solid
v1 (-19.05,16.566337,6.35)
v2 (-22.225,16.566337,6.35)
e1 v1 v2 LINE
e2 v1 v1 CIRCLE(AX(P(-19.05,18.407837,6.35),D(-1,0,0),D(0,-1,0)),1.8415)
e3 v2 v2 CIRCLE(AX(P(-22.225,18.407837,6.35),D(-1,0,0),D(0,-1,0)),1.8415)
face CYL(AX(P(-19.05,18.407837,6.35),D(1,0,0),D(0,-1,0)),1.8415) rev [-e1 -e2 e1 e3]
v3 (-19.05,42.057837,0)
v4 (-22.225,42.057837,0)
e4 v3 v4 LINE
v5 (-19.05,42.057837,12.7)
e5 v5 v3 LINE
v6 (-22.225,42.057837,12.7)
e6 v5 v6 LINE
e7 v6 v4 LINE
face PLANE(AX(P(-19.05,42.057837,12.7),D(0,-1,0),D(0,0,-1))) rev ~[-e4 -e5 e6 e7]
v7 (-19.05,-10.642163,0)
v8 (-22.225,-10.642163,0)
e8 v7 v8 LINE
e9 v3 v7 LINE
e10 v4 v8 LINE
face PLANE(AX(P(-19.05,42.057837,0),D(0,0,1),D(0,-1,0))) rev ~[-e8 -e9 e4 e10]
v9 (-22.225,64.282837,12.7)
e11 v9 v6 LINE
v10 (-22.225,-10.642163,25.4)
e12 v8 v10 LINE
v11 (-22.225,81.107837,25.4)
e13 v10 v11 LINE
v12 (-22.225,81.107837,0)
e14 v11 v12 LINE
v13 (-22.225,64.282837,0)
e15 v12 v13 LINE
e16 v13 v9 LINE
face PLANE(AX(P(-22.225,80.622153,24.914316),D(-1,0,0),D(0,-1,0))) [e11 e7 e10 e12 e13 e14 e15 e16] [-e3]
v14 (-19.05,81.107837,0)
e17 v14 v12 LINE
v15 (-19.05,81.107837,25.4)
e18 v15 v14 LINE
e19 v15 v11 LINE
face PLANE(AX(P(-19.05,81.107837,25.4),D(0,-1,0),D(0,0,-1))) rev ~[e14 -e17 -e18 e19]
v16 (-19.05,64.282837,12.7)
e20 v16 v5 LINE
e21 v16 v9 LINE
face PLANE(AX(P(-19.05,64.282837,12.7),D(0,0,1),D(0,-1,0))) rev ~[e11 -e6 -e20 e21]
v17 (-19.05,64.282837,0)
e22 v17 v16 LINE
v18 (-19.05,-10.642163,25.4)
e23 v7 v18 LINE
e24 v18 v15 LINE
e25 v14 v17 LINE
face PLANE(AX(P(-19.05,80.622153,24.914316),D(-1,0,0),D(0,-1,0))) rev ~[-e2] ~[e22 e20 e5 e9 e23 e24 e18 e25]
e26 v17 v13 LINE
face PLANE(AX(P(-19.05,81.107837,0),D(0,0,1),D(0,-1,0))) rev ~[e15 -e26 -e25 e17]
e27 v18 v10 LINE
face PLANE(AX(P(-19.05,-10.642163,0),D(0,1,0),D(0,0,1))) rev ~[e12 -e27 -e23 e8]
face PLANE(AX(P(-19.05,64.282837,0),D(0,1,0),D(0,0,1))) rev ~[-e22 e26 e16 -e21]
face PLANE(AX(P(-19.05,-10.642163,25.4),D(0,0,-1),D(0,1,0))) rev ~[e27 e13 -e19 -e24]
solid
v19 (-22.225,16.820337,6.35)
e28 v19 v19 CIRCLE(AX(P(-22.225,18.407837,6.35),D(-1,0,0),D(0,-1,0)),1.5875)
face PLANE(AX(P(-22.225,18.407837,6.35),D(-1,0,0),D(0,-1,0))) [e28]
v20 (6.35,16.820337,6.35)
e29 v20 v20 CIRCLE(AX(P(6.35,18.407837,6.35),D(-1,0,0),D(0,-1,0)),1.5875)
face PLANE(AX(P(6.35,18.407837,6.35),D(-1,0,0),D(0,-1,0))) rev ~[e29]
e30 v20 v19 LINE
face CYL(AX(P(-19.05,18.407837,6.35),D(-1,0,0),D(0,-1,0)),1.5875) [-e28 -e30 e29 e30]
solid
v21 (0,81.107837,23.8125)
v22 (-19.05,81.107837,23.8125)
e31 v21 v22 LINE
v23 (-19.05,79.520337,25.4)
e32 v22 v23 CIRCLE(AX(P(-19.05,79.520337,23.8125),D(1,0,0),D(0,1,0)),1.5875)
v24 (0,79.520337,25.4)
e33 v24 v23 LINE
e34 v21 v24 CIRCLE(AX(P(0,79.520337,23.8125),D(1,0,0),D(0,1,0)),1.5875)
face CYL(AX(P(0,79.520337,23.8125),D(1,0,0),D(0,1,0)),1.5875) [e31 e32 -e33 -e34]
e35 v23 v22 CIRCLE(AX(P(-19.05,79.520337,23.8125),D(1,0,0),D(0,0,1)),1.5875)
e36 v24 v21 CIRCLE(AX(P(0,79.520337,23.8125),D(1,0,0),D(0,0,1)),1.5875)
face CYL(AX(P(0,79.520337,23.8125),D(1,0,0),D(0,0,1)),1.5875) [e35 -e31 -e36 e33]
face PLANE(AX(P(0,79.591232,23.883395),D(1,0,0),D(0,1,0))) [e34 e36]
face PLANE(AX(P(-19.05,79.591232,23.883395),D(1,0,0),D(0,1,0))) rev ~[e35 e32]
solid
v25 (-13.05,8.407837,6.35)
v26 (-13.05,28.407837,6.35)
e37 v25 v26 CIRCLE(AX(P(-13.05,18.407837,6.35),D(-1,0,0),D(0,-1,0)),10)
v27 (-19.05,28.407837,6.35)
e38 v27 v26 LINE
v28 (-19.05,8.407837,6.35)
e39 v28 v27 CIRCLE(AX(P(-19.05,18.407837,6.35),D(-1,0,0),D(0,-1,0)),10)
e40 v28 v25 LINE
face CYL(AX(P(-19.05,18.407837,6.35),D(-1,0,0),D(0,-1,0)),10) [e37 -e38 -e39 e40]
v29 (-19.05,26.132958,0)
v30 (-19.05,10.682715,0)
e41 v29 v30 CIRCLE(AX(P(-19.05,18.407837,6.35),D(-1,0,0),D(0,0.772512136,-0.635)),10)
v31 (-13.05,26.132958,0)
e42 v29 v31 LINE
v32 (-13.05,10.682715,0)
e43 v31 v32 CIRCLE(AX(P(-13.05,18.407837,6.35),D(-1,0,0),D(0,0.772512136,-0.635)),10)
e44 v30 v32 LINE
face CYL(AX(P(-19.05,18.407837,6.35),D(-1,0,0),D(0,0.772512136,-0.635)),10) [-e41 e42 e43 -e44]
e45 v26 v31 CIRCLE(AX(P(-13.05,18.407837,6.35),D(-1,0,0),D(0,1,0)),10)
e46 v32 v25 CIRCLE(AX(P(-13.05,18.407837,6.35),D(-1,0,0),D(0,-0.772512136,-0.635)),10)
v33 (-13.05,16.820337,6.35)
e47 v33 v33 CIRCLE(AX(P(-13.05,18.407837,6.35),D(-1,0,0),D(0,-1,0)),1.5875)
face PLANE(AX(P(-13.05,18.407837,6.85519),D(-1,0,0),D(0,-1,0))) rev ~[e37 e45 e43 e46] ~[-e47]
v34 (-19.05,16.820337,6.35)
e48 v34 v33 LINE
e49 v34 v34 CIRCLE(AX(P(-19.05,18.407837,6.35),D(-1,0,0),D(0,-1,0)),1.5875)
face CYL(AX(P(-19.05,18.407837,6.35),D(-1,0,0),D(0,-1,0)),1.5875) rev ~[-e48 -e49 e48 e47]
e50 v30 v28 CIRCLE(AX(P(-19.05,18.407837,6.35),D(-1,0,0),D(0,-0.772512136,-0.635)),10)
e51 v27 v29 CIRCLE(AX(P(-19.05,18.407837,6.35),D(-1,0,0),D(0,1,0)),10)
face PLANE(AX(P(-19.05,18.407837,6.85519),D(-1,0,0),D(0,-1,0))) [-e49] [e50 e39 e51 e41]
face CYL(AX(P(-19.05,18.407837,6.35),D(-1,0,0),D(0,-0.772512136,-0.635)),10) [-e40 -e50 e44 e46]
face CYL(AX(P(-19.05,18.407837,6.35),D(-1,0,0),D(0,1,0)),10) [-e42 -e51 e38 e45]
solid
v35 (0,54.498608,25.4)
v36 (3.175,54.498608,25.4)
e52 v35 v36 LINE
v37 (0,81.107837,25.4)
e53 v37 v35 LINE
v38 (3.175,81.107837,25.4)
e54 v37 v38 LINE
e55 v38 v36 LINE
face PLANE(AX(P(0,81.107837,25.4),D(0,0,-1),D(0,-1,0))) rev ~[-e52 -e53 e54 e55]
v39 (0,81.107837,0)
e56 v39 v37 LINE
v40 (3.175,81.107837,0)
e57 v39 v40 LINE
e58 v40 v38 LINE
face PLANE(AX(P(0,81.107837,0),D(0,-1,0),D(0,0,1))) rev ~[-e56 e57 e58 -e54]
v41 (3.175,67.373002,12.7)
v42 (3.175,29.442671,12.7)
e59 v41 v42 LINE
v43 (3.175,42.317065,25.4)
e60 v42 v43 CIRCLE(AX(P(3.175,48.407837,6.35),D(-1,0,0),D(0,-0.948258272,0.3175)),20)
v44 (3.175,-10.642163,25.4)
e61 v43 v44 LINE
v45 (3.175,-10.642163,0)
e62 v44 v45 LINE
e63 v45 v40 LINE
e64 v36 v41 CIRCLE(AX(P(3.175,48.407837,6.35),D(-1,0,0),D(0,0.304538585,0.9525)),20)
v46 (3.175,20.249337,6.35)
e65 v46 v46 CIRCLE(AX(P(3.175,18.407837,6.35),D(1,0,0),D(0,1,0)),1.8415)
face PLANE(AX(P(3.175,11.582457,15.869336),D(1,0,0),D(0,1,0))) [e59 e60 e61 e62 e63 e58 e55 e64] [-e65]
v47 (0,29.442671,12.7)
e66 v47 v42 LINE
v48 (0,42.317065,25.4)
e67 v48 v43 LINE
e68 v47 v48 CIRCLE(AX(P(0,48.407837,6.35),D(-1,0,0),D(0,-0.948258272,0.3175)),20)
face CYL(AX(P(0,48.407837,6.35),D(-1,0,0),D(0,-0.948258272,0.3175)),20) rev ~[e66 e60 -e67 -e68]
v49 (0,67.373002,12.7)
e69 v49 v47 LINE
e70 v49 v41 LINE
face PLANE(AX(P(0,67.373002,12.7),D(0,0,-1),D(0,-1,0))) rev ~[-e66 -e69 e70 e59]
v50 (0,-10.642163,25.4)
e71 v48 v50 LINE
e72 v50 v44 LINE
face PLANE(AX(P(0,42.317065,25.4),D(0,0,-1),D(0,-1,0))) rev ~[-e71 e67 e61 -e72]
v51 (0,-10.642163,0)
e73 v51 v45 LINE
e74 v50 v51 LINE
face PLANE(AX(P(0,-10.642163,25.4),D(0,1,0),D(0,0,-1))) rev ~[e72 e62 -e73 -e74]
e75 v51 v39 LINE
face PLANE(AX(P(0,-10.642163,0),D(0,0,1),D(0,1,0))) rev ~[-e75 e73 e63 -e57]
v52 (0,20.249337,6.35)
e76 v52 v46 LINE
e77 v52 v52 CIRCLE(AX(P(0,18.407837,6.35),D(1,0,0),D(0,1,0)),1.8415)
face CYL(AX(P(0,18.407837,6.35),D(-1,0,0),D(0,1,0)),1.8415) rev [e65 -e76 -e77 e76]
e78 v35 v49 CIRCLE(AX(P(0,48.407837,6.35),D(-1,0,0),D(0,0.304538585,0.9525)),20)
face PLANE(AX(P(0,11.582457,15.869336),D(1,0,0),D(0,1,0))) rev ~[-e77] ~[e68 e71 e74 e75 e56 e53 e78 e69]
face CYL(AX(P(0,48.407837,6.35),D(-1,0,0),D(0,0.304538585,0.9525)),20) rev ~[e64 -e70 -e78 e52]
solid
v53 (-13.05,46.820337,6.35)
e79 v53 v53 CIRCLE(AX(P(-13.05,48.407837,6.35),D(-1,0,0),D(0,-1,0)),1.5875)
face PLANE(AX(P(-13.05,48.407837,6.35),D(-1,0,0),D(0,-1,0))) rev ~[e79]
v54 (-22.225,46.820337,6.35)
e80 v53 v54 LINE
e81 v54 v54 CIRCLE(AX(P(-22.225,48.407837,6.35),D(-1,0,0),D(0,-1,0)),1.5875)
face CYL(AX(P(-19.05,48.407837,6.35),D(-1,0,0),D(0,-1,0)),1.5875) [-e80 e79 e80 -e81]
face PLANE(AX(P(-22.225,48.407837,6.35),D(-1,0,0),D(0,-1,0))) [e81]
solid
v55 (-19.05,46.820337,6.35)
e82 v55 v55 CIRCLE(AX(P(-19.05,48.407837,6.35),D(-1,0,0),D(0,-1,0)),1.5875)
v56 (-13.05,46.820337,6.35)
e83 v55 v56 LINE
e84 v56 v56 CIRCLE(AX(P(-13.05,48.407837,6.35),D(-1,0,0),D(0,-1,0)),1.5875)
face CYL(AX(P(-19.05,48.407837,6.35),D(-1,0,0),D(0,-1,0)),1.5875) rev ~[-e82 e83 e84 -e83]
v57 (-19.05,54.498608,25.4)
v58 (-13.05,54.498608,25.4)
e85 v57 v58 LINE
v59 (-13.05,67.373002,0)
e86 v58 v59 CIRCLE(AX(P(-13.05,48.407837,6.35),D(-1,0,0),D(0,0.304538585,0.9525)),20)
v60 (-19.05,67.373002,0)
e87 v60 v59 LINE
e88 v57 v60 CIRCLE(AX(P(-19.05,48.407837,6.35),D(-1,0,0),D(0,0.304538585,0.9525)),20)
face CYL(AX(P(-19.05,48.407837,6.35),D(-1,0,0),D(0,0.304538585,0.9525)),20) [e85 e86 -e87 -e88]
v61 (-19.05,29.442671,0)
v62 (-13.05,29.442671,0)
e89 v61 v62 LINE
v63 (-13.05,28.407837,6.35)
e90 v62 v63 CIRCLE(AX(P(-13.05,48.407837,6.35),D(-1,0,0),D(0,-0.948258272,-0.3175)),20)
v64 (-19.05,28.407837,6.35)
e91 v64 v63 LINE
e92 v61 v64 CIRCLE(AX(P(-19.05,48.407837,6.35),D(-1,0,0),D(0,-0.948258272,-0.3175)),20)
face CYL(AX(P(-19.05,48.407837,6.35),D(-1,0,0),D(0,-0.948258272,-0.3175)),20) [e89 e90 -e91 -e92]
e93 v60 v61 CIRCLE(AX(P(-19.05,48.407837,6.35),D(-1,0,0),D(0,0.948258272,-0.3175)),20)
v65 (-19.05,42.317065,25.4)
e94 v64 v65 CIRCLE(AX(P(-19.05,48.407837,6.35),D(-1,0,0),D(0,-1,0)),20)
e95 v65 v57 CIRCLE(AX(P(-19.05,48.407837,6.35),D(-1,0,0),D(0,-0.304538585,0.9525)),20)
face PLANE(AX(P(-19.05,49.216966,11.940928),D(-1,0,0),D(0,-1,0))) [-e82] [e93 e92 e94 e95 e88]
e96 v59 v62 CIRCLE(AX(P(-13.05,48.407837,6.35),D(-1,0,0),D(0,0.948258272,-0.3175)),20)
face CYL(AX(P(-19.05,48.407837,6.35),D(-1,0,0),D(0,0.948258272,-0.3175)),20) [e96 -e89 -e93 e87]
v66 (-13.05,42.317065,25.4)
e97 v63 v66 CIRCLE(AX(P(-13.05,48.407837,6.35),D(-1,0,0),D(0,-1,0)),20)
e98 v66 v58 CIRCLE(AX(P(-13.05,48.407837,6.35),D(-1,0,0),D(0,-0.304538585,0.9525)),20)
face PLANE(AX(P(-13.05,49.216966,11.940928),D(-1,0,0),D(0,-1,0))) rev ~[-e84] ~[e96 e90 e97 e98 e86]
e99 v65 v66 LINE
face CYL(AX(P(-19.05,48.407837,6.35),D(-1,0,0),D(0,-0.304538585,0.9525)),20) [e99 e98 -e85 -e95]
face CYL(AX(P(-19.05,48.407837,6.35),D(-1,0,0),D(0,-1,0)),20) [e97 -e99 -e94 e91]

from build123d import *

# Parameters (mm, degrees)
F0_R      = 1.8415
F0_R_2    = 1.5875
F1_DEPTH  = 3.175
F2_DEPTH  = 19.05
F3_R      = 1.8415
F4_DEPTH  = 3.175
F3_R_2    = 1.5875
F5_DEPTH  = 3.175
F6_DEPTH  = 6
F7_DEPTH  = 6
F8_DEPTH  = 3.175
F9_DEPTH  = 25.4
F10_DEPTH = 6


# Not quite as in the source:
# - a feature names something its author has since deleted; it is built from what else it names


with BuildPart() as f1:
    # F0 (on Right) → F1 (new body)
    with BuildSketch(Plane.YZ):
        with BuildLine():
            Line((26.1329581332, 12.7), (29.4426713393, 12.7))
            ThreePointArc((29.4426713393, 12.7), (34.3624639947, 20.5882408837), (42.3170650669, 25.4))
            Line((42.3170650669, 25.4), (41.8216693056, 25.4))
            Line((41.8216693056, 25.4), (35.8211970083, 25.4))
            Line((35.8211970083, 25.4), (-10.6421632251, 25.4))
            Line((-10.6421632251, 25.4), (-10.6421632251, 0))
            Line((-10.6421632251, 0), (10.6827154167, 0))
            ThreePointArc((10.6827154167, 0), (12.0578367749, 14.0751213583), (26.1329581332, 12.7))
        make_face()
        with BuildLine():
            ThreePointArc((67.3730022106, 0), (68.1474328791, 3.1331155377), (68.4078367749, 6.35))
            ThreePointArc((68.4078367749, 6.35), (68.1474328791, 9.5668844623), (67.3730022106, 12.7))
            Line((67.3730022106, 12.7), (29.4426713393, 12.7))
            ThreePointArc((29.4426713393, 12.7), (28.6682406708, 9.5668844623), (28.4078367749, 6.35))
            ThreePointArc((28.4078367749, 6.35), (28.6682406708, 3.1331155377), (29.4426713393, 0))
            Line((29.4426713393, 0), (67.3730022106, 0))
        make_face()
        with Locations((48.4078367749, 6.35)):
            Circle(F0_R, mode=Mode.SUBTRACT)
        with BuildLine():
            ThreePointArc((54.498608483, 25.4), (62.4532095552, 20.5882408837), (67.3730022106, 12.7))
            Line((67.3730022106, 12.7), (74.2828367749, 12.7))
            Line((74.2828367749, 12.7), (74.2828367749, 0))
            Line((74.2828367749, 0), (80.2833090723, 0))
            Line((80.2833090723, 0), (81.1078367749, 0))
            Line((81.1078367749, 0), (81.1078367749, 23.8125))
            ThreePointArc((81.1078367749, 23.8125), (78.3978047598, 22.6899679849), (79.5203367749, 25.4))
            Line((79.5203367749, 25.4), (54.498608483, 25.4))
        make_face()
        with BuildLine():
            Line((22.0578367749, 12.7), (26.1329581332, 12.7))
            ThreePointArc((26.1329581332, 12.7), (12.0578367749, 14.0751213583), (10.6827154167, 0))
            Line((10.6827154167, 0), (22.0578367749, 0))
            Line((22.0578367749, 0), (22.0578367749, 12.7))
        make_face()
        with Locations((18.4078367749, 6.35)):
            Circle(F0_R, mode=Mode.SUBTRACT)
        with BuildLine():
            ThreePointArc((67.3730022106, 12.7), (68.1474328791, 9.5668844623), (68.4078367749, 6.35))
            ThreePointArc((68.4078367749, 6.35), (68.1474328791, 3.1331155377), (67.3730022106, 0))
            Line((67.3730022106, 0), (73.4878367749, 0))
            Line((73.4878367749, 0), (74.2828367749, 0))
            Line((74.2828367749, 0), (74.2828367749, 12.7))
            Line((74.2828367749, 12.7), (67.3730022106, 12.7))
        make_face()
        with BuildLine():
            ThreePointArc((26.1329581332, 0), (27.8219541946, 2.9774055671), (28.4078367749, 6.35))
            ThreePointArc((28.4078367749, 6.35), (27.8219541946, 9.7225944329), (26.1329581332, 12.7))
            Line((26.1329581332, 12.7), (22.0578367749, 12.7))
            Line((22.0578367749, 12.7), (22.0578367749, 0))
            Line((22.0578367749, 0), (26.1329581332, 0))
        make_face()
        with Locations((48.4078367749, 6.35)):
            Circle(F0_R)
        with Locations((48.4078367749, 6.35)):
            Circle(F0_R_2, mode=Mode.SUBTRACT)
        with Locations((48.4078367749, 6.35)):
            Circle(F0_R_2)
        with BuildLine():
            ThreePointArc((81.1078367749, 23.8125), (80.6428687901, 24.9350320151), (79.5203367749, 25.4))
            ThreePointArc((79.5203367749, 25.4), (78.3978047598, 22.6899679849), (81.1078367749, 23.8125))
        make_face()
        with BuildLine():
            ThreePointArc((28.4078367749, 6.35), (28.6682406708, 9.5668844623), (29.4426713393, 12.7))
            Line((29.4426713393, 12.7), (26.1329581332, 12.7))
            ThreePointArc((26.1329581332, 12.7), (27.8219541946, 9.7225944329), (28.4078367749, 6.35))
        make_face()
        with BuildLine():
            Line((26.1329581332, 0), (29.4426713393, 0))
            ThreePointArc((29.4426713393, 0), (28.6682406708, 3.1331155377), (28.4078367749, 6.35))
            ThreePointArc((28.4078367749, 6.35), (27.8219541946, 2.9774055671), (26.1329581332, 0))
        make_face()
        with BuildLine():
            Line((81.1078367749, 25.4), (79.5203367749, 25.4))
            ThreePointArc((79.5203367749, 25.4), (80.6428687901, 24.9350320151), (81.1078367749, 23.8125))
            Line((81.1078367749, 23.8125), (81.1078367749, 25.4))
        make_face()
    extrude(amount=F1_DEPTH)


with BuildPart() as f2:
    # F0 (on Right) → F2 (new body)
    with BuildSketch(Plane.YZ):
        with BuildLine():
            ThreePointArc((81.1078367749, 23.8125), (80.6428687901, 24.9350320151), (79.5203367749, 25.4))
            ThreePointArc((79.5203367749, 25.4), (78.3978047598, 22.6899679849), (81.1078367749, 23.8125))
        make_face()
    extrude(amount=-F2_DEPTH)


with BuildPart() as f4:
    # F3 (on face) → F4 (new body)
    with BuildSketch(Plane(origin=(-19.05, 0, 0), x_dir=(0, -1, 0), z_dir=(-1, 0, 0))):
        with BuildLine():
            Line((-79.5203367749, 25.4), (-81.1078367749, 25.4))
            Line((-81.1078367749, 25.4), (-81.1078367749, 23.8125))
            ThreePointArc((-81.1078367749, 23.8125), (-80.6428687901, 24.9350320151), (-79.5203367749, 25.4))
        make_face()
        with BuildLine():
            Line((-54.498608483, 25.4), (-79.5203367749, 25.4))
            ThreePointArc((-79.5203367749, 25.4), (-78.3978047598, 24.9350320151), (-77.9328367749, 23.8125))
            ThreePointArc((-77.9328367749, 23.8125), (-79.5203367749, 22.225), (-81.1078367749, 23.8125))
            Line((-81.1078367749, 23.8125), (-81.1078367749, 0))
            Line((-81.1078367749, 0), (-67.3730022106, 0))
            ThreePointArc((-67.3730022106, 0), (-66.2471191747, 15.3921238358), (-54.498608483, 25.4))
        make_face()
        with BuildLine():
            ThreePointArc((-77.9328367749, 23.8125), (-78.3978047598, 24.9350320151), (-79.5203367749, 25.4))
            ThreePointArc((-79.5203367749, 25.4), (-80.6428687901, 24.9350320151), (-81.1078367749, 23.8125))
            ThreePointArc((-81.1078367749, 23.8125), (-79.5203367749, 22.225), (-77.9328367749, 23.8125))
        make_face()
        with BuildLine():
            Line((-42.3170650669, 25.4), (-54.498608483, 25.4))
            ThreePointArc((-54.498608483, 25.4), (-66.2471191747, 15.3921238358), (-67.3730022106, 0))
            Line((-67.3730022106, 0), (-64.2828367749, 0))
            Line((-64.2828367749, 0), (-64.2828367749, 12.7))
            Line((-64.2828367749, 12.7), (-42.0578367749, 12.7))
            Line((-42.0578367749, 12.7), (-42.0578367749, 6.35))
            Line((-42.0578367749, 6.35), (-42.0578367749, 0))
            Line((-42.0578367749, 0), (-29.4426713393, 0))
            ThreePointArc((-29.4426713393, 0), (-28.6682406708, 3.1331155377), (-28.4078367749, 6.35))
            ThreePointArc((-28.4078367749, 6.35), (-32.2551986907, 18.1437391407), (-42.3170650669, 25.4))
        make_face()
        with BuildLine():
            Line((10.6421632251, 25.4), (-42.3170650669, 25.4))
            ThreePointArc((-42.3170650669, 25.4), (-32.2551986907, 18.1437391407), (-28.4078367749, 6.35))
            ThreePointArc((-28.4078367749, 6.35), (-18.4078367749, 16.35), (-8.4078367749, 6.35))
            ThreePointArc((-8.4078367749, 6.35), (-8.9937193553, 2.9774055671), (-10.6827154167, 0))
            Line((-10.6827154167, 0), (10.6421632251, 0))
            Line((10.6421632251, 0), (10.6421632251, 25.4))
        make_face()
        with BuildLine():
            ThreePointArc((-26.1329581332, 0), (-27.8219541946, 2.9774055671), (-28.4078367749, 6.35))
            ThreePointArc((-28.4078367749, 6.35), (-28.6682406708, 3.1331155377), (-29.4426713393, 0))
            Line((-29.4426713393, 0), (-26.1329581332, 0))
        make_face()
        with BuildLine():
            ThreePointArc((-8.4078367749, 6.35), (-18.4078367749, 16.35), (-28.4078367749, 6.35))
            ThreePointArc((-28.4078367749, 6.35), (-27.8219541946, 2.9774055671), (-26.1329581332, 0))
            Line((-26.1329581332, 0), (-10.6827154167, 0))
            ThreePointArc((-10.6827154167, 0), (-8.9937193553, 2.9774055671), (-8.4078367749, 6.35))
        make_face()
        with Locations((-18.4078367749, 6.35)):
            Circle(F3_R, mode=Mode.SUBTRACT)
    extrude(amount=F4_DEPTH)


with BuildPart() as f5:
    # F3 (on face) → F5 (new body)
    with BuildSketch(Plane(origin=(-19.05, 0, 0), x_dir=(0, -1, 0), z_dir=(-1, 0, 0))):
        with Locations((-48.4078367749, 6.35)):
            Circle(F3_R_2)
    extrude(amount=F5_DEPTH)

    # F3 (on face) → F6 (join)
    with BuildSketch(Plane(origin=(-19.05, 0, 0), x_dir=(0, -1, 0), z_dir=(-1, 0, 0))):
        with Locations((-48.4078367749, 6.35)):
            Circle(F3_R_2)
    extrude(amount=-F6_DEPTH)


with BuildPart() as f7:
    # F3 (on face) → F7 (new body)
    with BuildSketch(Plane(origin=(-19.05, 0, 0), x_dir=(0, -1, 0), z_dir=(-1, 0, 0))):
        with BuildLine():
            Line((-42.3170650669, 25.4), (-54.498608483, 25.4))
            ThreePointArc((-54.498608483, 25.4), (-66.2471191747, 15.3921238358), (-67.3730022106, 0))
            Line((-67.3730022106, 0), (-64.2828367749, 0))
            Line((-64.2828367749, 0), (-64.2828367749, 12.7))
            Line((-64.2828367749, 12.7), (-42.0578367749, 12.7))
            Line((-42.0578367749, 12.7), (-42.0578367749, 6.35))
            Line((-42.0578367749, 6.35), (-42.0578367749, 0))
            Line((-42.0578367749, 0), (-29.4426713393, 0))
            ThreePointArc((-29.4426713393, 0), (-28.6682406708, 3.1331155377), (-28.4078367749, 6.35))
            ThreePointArc((-28.4078367749, 6.35), (-32.2551986907, 18.1437391407), (-42.3170650669, 25.4))
        make_face()
        with BuildLine():
            Line((-64.2828367749, 0), (-67.3730022106, 0))
            ThreePointArc((-67.3730022106, 0), (-48.4078367749, -13.65), (-29.4426713393, 0))
            Line((-29.4426713393, 0), (-42.0578367749, 0))
            Line((-42.0578367749, 0), (-64.2828367749, 0))
        make_face()
        Polygon((-64.2828367749, 12.7), (-64.2828367749, 0), (-42.0578367749, 0), (-42.0578367749, 6.35), (-42.0578367749, 12.7), align=None)
        with Locations((-48.4078367749, 6.35)):
            Circle(F3_R, mode=Mode.SUBTRACT)
        with Locations((-48.4078367749, 6.35)):
            Circle(F3_R)
        with Locations((-48.4078367749, 6.35)):
            Circle(F3_R_2, mode=Mode.SUBTRACT)
        with BuildLine():
            ThreePointArc((-42.3170650669, 25.4), (-48.4078367749, 26.35), (-54.498608483, 25.4))
            Line((-54.498608483, 25.4), (-42.3170650669, 25.4))
        make_face()
    extrude(amount=-F7_DEPTH)


with BuildPart() as f8:
    # F3 (on face) → F8 (new body)
    with BuildSketch(Plane(origin=(-19.05, 0, 0), x_dir=(0, -1, 0), z_dir=(-1, 0, 0))):
        with Locations((-18.4078367749, 6.35)):
            Circle(F3_R_2)
    extrude(amount=F8_DEPTH)

    # F3 (on face) → F9 (join)
    with BuildSketch(Plane(origin=(-19.05, 0, 0), x_dir=(0, -1, 0), z_dir=(-1, 0, 0))):
        with Locations((-18.4078367749, 6.35)):
            Circle(F3_R_2)
    extrude(amount=-F9_DEPTH)


with BuildPart() as f10:
    # F3 (on face) → F10 (new body)
    with BuildSketch(Plane(origin=(-19.05, 0, 0), x_dir=(0, -1, 0), z_dir=(-1, 0, 0))):
        with BuildLine():
            ThreePointArc((-8.4078367749, 6.35), (-18.4078367749, 16.35), (-28.4078367749, 6.35))
            ThreePointArc((-28.4078367749, 6.35), (-27.8219541946, 2.9774055671), (-26.1329581332, 0))
            Line((-26.1329581332, 0), (-10.6827154167, 0))
            ThreePointArc((-10.6827154167, 0), (-8.9937193553, 2.9774055671), (-8.4078367749, 6.35))
        make_face()
        with Locations((-18.4078367749, 6.35)):
            Circle(F3_R, mode=Mode.SUBTRACT)
        with Locations((-18.4078367749, 6.35)):
            Circle(F3_R)
        with Locations((-18.4078367749, 6.35)):
            Circle(F3_R_2, mode=Mode.SUBTRACT)
        with BuildLine():
            Line((-10.6827154167, 0), (-26.1329581332, 0))
            ThreePointArc((-26.1329581332, 0), (-18.4078367749, -3.65), (-10.6827154167, 0))
        make_face()
    extrude(amount=-F10_DEPTH)


solid = Compound([f1.part, f2.part, f4.part, f5.part, f7.part, f8.part, f10.part])
